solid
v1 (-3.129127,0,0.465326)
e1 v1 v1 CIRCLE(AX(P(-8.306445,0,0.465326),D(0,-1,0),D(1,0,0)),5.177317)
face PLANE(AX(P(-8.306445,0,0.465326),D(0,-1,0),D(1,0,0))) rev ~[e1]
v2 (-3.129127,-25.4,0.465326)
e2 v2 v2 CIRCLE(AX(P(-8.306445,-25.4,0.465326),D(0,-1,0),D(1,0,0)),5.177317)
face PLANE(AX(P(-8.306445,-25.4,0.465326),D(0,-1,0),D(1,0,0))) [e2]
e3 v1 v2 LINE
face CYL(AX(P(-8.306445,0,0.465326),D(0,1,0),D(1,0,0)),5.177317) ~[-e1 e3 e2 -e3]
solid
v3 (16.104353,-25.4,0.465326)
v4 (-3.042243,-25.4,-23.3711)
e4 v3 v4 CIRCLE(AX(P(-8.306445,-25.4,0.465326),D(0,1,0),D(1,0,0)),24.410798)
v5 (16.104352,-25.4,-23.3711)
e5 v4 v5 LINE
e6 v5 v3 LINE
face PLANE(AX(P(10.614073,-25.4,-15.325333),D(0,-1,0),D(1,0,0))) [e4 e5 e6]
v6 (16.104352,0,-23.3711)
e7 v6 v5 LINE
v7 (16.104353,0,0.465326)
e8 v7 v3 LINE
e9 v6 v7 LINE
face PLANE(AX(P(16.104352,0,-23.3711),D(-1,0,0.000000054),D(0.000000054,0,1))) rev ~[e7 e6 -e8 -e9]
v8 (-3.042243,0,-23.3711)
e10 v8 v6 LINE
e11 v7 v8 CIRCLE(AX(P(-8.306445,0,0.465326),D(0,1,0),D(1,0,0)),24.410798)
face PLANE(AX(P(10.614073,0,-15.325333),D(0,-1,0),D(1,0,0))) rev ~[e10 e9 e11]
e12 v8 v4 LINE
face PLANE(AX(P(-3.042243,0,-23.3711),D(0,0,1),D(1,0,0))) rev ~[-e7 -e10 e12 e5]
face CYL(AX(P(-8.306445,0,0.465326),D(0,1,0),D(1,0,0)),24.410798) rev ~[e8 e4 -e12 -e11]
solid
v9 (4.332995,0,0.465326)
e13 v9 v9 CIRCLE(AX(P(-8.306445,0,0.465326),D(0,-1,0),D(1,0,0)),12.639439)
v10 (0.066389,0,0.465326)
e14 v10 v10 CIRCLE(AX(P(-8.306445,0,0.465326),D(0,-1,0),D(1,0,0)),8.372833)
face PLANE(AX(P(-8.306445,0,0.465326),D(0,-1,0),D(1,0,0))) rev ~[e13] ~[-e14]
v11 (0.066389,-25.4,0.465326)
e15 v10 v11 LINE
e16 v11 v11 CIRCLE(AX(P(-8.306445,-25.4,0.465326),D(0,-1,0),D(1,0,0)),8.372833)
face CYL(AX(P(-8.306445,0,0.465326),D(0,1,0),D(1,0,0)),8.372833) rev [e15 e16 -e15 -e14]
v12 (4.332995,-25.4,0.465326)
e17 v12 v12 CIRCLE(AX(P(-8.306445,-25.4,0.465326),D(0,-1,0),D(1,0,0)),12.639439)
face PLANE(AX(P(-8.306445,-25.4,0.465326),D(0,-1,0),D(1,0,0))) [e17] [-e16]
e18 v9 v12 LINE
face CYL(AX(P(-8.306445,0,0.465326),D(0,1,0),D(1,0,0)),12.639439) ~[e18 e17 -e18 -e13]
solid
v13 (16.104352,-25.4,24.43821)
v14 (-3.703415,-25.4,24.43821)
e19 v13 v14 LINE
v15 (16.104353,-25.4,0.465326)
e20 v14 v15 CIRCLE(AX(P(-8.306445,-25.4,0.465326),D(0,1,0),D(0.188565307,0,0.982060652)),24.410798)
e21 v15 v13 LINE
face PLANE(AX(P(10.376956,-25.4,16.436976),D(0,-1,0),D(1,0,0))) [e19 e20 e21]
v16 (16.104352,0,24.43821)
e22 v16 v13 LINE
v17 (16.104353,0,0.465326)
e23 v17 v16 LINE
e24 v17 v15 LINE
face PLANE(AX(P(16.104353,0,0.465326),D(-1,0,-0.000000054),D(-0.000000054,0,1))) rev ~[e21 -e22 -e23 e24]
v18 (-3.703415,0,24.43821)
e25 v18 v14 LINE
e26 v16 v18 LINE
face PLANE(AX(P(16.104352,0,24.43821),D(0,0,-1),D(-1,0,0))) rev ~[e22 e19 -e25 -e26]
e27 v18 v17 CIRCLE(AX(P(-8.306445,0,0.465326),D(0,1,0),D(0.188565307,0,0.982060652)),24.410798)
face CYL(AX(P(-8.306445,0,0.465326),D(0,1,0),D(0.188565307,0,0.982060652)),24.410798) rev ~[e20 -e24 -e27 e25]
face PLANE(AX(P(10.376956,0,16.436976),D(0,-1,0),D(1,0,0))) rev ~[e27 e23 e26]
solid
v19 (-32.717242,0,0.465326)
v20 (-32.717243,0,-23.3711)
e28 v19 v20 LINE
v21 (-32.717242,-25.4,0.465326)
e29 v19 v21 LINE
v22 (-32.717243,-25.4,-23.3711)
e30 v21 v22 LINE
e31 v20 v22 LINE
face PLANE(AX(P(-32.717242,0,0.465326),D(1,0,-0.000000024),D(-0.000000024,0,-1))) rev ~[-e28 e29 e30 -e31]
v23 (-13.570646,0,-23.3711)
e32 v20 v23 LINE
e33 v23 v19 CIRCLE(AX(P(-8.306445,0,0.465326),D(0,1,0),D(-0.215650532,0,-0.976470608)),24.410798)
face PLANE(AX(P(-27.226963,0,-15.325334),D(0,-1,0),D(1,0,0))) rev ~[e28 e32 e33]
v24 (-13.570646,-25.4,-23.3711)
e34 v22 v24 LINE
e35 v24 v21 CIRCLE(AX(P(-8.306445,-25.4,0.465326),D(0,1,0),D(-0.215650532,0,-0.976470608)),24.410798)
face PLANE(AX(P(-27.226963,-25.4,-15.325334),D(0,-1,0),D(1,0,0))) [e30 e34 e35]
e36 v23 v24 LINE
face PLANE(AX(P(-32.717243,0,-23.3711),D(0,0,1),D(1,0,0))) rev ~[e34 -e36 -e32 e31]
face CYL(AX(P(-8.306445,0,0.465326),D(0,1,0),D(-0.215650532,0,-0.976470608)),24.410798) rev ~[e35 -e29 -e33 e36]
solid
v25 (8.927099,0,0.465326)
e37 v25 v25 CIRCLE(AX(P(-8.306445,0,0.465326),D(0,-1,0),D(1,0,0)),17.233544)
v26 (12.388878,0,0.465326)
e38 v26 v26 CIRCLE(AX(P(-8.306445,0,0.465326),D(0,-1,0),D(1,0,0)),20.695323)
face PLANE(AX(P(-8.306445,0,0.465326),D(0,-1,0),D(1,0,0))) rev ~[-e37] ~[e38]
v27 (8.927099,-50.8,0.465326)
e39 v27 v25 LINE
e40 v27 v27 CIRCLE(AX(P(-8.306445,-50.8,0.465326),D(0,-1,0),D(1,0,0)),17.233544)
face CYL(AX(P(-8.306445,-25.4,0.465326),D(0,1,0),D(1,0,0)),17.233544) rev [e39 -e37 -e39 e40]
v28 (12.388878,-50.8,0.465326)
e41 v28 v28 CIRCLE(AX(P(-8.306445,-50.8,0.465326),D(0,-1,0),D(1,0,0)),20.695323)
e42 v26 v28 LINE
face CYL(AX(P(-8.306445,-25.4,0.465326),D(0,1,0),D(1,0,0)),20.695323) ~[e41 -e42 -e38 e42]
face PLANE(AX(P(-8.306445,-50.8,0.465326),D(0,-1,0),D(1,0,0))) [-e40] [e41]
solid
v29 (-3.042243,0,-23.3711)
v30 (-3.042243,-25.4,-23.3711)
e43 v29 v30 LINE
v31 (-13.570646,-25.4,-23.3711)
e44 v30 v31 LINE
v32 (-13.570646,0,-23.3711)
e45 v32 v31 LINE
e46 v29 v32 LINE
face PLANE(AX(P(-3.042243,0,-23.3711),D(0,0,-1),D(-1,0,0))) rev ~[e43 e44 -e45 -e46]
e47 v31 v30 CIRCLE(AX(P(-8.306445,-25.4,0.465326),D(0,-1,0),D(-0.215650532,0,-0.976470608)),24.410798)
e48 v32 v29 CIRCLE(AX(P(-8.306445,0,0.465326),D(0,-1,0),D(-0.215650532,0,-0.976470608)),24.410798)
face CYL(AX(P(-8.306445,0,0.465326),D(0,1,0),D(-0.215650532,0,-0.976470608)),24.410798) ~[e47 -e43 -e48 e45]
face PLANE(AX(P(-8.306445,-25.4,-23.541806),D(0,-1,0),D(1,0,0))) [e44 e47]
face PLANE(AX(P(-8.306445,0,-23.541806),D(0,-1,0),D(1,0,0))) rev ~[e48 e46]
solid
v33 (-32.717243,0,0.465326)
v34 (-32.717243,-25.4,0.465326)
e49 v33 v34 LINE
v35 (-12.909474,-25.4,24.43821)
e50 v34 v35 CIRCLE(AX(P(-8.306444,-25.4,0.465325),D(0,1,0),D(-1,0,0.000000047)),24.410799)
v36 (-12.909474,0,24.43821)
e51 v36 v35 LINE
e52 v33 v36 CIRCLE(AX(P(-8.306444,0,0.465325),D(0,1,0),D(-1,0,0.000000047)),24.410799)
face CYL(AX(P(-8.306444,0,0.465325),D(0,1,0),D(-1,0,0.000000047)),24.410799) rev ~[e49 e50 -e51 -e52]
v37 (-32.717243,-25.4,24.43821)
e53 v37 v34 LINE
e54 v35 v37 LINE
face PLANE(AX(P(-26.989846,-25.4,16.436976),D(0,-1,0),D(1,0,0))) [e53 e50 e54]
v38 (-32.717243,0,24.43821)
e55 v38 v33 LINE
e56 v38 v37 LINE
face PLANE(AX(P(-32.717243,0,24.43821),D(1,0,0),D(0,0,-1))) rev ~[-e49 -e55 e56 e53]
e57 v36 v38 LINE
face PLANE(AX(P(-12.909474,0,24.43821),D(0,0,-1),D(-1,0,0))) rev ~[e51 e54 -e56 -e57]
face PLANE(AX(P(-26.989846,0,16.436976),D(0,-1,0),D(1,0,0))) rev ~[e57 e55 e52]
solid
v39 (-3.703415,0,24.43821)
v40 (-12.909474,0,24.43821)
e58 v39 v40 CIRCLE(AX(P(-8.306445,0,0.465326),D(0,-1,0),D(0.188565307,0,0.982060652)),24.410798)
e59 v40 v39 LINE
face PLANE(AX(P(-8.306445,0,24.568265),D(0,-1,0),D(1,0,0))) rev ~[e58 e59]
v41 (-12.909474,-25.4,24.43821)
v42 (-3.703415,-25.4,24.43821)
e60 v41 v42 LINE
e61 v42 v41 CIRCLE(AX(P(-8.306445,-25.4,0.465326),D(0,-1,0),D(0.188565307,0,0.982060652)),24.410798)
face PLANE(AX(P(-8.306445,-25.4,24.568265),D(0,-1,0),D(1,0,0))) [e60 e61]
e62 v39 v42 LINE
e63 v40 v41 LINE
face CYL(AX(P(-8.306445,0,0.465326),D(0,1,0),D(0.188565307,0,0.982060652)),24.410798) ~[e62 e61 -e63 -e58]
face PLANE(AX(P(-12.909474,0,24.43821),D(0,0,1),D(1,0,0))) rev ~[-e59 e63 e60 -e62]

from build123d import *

# Parameters (mm, degrees)
F1_DEPTH = 25.4
F0_R     = 12.6394393626
F0_R_2   = 8.3728331527
F0_R_3   = 5.1773172291
F0_R_4   = 20.6953225865
F0_R_5   = 17.2335435778
F2_DEPTH = 25.4


# Not quite as in the source:
# - ends of sketch curves that miss each other by under 0.0002 mm in the source are joined
# - a feature names something its author has since deleted; it is built from what else it names


with BuildPart() as f1:
    # F0 (on Front) → F1 (new body)
    with BuildSketch(Plane.XZ):
        with BuildLine():
            Line((-12.9094741786, 24.4382098317), (-32.717242837, 24.4382098317))
            Line((-32.717242837, 24.4382098317), (-32.717242837, 0.4653259821))
            ThreePointArc((-32.717242837, 0.4653259821), (-27.1246627125, 16.0140143217), (-12.9094741786, 24.4382098317))
        make_face()
    extrude(amount=F1_DEPTH)


with BuildPart() as f1b:
    # F0 (on Front) → F1, piece 2 (new body)
    with BuildSketch(Plane.XZ):
        with BuildLine():
            ThreePointArc((-13.5706461069, -23.3711004257), (-27.3378712415, -14.8216567814), (-32.7172422573, 0.4653259821))
            Line((-32.7172422573, 0.4653259821), (-32.717242837, -23.3711004257))
            Line((-32.717242837, -23.3711004257), (-13.5706461069, -23.3711004257))
        make_face()
    extrude(amount=F1_DEPTH)


with BuildPart() as f1c:
    # F0 (on Front) → F1, piece 3 (new body)
    with BuildSketch(Plane.XZ):
        with BuildLine():
            ThreePointArc((-3.7034150665, 24.4382098317), (-8.3064446226, 24.8761236168), (-12.9094741786, 24.4382098317))
            Line((-12.9094741786, 24.4382098317), (-3.7034150665, 24.4382098317))
        make_face()
    extrude(amount=F1_DEPTH)


with BuildPart() as f1d:
    # F0 (on Front) → F1, piece 4 (new body)
    with BuildSketch(Plane.XZ):
        with BuildLine():
            Line((16.1043517292, 24.4382098317), (-3.7034150665, 24.4382098317))
            ThreePointArc((-3.7034150665, 24.4382098317), (10.5117734674, 16.0140143217), (16.1043530121, 0.4653259821))
            Line((16.1043530121, 0.4653259821), (16.1043517292, 24.4382098317))
        make_face()
    extrude(amount=F1_DEPTH)


with BuildPart() as f1e:
    # F0 (on Front) → F1, piece 5 (new body)
    with BuildSketch(Plane.XZ):
        with BuildLine():
            ThreePointArc((16.1043530121, 0.4653259821), (10.7249819964, -14.8216567814), (-3.0422431382, -23.3711004257))
            Line((-3.0422431382, -23.3711004257), (16.1043517292, -23.3711004257))
            Line((16.1043517292, -23.3711004257), (16.1043530121, 0.4653259821))
        make_face()
    extrude(amount=F1_DEPTH)


with BuildPart() as f1f:
    # F0 (on Front) → F1, piece 6 (new body)
    with BuildSketch(Plane.XZ):
        with BuildLine():
            Line((-3.0422431382, -23.3711004257), (-13.5706461069, -23.3711004257))
            ThreePointArc((-13.5706461069, -23.3711004257), (-8.3064446226, -23.9454716526), (-3.0422431382, -23.3711004257))
        make_face()
    extrude(amount=F1_DEPTH)


with BuildPart() as f1g:
    # F0 (on Front) → F1, piece 7 (new body)
    with BuildSketch(Plane.XZ):
        with Locations((-8.3064446226, 0.4653259821)):
            Circle(F0_R)
        with Locations((-8.3064446226, 0.4653259821)):
            Circle(F0_R_2, mode=Mode.SUBTRACT)
    extrude(amount=F1_DEPTH)


with BuildPart() as f1h:
    # F0 (on Front) → F1, piece 8 (new body)
    with BuildSketch(Plane.XZ):
        with Locations((-8.3064446226, 0.4653259821)):
            Circle(F0_R_3)
    extrude(amount=F1_DEPTH)


with BuildPart() as f1i:
    # F0 (on Front) → F1, piece 9 (new body)
    with BuildSketch(Plane.XZ):
        with Locations((-8.3064446226, 0.4653259821)):
            Circle(F0_R_4)
        with Locations((-8.3064446226, 0.4653259821)):
            Circle(F0_R_5, mode=Mode.SUBTRACT)
    extrude(amount=F1_DEPTH)

    # F2 (add): a face of the model
    f2_faces = [f1i.faces().sort_by_distance(p)[0] for p in [
        (-28.4164150914, -25.4, 0.4653259821),
    ]]
    extrude(f2_faces, amount=F2_DEPTH)


solid = Compound([f1.part, f1b.part, f1c.part, f1d.part, f1e.part, f1f.part, f1g.part, f1h.part, f1i.part])
